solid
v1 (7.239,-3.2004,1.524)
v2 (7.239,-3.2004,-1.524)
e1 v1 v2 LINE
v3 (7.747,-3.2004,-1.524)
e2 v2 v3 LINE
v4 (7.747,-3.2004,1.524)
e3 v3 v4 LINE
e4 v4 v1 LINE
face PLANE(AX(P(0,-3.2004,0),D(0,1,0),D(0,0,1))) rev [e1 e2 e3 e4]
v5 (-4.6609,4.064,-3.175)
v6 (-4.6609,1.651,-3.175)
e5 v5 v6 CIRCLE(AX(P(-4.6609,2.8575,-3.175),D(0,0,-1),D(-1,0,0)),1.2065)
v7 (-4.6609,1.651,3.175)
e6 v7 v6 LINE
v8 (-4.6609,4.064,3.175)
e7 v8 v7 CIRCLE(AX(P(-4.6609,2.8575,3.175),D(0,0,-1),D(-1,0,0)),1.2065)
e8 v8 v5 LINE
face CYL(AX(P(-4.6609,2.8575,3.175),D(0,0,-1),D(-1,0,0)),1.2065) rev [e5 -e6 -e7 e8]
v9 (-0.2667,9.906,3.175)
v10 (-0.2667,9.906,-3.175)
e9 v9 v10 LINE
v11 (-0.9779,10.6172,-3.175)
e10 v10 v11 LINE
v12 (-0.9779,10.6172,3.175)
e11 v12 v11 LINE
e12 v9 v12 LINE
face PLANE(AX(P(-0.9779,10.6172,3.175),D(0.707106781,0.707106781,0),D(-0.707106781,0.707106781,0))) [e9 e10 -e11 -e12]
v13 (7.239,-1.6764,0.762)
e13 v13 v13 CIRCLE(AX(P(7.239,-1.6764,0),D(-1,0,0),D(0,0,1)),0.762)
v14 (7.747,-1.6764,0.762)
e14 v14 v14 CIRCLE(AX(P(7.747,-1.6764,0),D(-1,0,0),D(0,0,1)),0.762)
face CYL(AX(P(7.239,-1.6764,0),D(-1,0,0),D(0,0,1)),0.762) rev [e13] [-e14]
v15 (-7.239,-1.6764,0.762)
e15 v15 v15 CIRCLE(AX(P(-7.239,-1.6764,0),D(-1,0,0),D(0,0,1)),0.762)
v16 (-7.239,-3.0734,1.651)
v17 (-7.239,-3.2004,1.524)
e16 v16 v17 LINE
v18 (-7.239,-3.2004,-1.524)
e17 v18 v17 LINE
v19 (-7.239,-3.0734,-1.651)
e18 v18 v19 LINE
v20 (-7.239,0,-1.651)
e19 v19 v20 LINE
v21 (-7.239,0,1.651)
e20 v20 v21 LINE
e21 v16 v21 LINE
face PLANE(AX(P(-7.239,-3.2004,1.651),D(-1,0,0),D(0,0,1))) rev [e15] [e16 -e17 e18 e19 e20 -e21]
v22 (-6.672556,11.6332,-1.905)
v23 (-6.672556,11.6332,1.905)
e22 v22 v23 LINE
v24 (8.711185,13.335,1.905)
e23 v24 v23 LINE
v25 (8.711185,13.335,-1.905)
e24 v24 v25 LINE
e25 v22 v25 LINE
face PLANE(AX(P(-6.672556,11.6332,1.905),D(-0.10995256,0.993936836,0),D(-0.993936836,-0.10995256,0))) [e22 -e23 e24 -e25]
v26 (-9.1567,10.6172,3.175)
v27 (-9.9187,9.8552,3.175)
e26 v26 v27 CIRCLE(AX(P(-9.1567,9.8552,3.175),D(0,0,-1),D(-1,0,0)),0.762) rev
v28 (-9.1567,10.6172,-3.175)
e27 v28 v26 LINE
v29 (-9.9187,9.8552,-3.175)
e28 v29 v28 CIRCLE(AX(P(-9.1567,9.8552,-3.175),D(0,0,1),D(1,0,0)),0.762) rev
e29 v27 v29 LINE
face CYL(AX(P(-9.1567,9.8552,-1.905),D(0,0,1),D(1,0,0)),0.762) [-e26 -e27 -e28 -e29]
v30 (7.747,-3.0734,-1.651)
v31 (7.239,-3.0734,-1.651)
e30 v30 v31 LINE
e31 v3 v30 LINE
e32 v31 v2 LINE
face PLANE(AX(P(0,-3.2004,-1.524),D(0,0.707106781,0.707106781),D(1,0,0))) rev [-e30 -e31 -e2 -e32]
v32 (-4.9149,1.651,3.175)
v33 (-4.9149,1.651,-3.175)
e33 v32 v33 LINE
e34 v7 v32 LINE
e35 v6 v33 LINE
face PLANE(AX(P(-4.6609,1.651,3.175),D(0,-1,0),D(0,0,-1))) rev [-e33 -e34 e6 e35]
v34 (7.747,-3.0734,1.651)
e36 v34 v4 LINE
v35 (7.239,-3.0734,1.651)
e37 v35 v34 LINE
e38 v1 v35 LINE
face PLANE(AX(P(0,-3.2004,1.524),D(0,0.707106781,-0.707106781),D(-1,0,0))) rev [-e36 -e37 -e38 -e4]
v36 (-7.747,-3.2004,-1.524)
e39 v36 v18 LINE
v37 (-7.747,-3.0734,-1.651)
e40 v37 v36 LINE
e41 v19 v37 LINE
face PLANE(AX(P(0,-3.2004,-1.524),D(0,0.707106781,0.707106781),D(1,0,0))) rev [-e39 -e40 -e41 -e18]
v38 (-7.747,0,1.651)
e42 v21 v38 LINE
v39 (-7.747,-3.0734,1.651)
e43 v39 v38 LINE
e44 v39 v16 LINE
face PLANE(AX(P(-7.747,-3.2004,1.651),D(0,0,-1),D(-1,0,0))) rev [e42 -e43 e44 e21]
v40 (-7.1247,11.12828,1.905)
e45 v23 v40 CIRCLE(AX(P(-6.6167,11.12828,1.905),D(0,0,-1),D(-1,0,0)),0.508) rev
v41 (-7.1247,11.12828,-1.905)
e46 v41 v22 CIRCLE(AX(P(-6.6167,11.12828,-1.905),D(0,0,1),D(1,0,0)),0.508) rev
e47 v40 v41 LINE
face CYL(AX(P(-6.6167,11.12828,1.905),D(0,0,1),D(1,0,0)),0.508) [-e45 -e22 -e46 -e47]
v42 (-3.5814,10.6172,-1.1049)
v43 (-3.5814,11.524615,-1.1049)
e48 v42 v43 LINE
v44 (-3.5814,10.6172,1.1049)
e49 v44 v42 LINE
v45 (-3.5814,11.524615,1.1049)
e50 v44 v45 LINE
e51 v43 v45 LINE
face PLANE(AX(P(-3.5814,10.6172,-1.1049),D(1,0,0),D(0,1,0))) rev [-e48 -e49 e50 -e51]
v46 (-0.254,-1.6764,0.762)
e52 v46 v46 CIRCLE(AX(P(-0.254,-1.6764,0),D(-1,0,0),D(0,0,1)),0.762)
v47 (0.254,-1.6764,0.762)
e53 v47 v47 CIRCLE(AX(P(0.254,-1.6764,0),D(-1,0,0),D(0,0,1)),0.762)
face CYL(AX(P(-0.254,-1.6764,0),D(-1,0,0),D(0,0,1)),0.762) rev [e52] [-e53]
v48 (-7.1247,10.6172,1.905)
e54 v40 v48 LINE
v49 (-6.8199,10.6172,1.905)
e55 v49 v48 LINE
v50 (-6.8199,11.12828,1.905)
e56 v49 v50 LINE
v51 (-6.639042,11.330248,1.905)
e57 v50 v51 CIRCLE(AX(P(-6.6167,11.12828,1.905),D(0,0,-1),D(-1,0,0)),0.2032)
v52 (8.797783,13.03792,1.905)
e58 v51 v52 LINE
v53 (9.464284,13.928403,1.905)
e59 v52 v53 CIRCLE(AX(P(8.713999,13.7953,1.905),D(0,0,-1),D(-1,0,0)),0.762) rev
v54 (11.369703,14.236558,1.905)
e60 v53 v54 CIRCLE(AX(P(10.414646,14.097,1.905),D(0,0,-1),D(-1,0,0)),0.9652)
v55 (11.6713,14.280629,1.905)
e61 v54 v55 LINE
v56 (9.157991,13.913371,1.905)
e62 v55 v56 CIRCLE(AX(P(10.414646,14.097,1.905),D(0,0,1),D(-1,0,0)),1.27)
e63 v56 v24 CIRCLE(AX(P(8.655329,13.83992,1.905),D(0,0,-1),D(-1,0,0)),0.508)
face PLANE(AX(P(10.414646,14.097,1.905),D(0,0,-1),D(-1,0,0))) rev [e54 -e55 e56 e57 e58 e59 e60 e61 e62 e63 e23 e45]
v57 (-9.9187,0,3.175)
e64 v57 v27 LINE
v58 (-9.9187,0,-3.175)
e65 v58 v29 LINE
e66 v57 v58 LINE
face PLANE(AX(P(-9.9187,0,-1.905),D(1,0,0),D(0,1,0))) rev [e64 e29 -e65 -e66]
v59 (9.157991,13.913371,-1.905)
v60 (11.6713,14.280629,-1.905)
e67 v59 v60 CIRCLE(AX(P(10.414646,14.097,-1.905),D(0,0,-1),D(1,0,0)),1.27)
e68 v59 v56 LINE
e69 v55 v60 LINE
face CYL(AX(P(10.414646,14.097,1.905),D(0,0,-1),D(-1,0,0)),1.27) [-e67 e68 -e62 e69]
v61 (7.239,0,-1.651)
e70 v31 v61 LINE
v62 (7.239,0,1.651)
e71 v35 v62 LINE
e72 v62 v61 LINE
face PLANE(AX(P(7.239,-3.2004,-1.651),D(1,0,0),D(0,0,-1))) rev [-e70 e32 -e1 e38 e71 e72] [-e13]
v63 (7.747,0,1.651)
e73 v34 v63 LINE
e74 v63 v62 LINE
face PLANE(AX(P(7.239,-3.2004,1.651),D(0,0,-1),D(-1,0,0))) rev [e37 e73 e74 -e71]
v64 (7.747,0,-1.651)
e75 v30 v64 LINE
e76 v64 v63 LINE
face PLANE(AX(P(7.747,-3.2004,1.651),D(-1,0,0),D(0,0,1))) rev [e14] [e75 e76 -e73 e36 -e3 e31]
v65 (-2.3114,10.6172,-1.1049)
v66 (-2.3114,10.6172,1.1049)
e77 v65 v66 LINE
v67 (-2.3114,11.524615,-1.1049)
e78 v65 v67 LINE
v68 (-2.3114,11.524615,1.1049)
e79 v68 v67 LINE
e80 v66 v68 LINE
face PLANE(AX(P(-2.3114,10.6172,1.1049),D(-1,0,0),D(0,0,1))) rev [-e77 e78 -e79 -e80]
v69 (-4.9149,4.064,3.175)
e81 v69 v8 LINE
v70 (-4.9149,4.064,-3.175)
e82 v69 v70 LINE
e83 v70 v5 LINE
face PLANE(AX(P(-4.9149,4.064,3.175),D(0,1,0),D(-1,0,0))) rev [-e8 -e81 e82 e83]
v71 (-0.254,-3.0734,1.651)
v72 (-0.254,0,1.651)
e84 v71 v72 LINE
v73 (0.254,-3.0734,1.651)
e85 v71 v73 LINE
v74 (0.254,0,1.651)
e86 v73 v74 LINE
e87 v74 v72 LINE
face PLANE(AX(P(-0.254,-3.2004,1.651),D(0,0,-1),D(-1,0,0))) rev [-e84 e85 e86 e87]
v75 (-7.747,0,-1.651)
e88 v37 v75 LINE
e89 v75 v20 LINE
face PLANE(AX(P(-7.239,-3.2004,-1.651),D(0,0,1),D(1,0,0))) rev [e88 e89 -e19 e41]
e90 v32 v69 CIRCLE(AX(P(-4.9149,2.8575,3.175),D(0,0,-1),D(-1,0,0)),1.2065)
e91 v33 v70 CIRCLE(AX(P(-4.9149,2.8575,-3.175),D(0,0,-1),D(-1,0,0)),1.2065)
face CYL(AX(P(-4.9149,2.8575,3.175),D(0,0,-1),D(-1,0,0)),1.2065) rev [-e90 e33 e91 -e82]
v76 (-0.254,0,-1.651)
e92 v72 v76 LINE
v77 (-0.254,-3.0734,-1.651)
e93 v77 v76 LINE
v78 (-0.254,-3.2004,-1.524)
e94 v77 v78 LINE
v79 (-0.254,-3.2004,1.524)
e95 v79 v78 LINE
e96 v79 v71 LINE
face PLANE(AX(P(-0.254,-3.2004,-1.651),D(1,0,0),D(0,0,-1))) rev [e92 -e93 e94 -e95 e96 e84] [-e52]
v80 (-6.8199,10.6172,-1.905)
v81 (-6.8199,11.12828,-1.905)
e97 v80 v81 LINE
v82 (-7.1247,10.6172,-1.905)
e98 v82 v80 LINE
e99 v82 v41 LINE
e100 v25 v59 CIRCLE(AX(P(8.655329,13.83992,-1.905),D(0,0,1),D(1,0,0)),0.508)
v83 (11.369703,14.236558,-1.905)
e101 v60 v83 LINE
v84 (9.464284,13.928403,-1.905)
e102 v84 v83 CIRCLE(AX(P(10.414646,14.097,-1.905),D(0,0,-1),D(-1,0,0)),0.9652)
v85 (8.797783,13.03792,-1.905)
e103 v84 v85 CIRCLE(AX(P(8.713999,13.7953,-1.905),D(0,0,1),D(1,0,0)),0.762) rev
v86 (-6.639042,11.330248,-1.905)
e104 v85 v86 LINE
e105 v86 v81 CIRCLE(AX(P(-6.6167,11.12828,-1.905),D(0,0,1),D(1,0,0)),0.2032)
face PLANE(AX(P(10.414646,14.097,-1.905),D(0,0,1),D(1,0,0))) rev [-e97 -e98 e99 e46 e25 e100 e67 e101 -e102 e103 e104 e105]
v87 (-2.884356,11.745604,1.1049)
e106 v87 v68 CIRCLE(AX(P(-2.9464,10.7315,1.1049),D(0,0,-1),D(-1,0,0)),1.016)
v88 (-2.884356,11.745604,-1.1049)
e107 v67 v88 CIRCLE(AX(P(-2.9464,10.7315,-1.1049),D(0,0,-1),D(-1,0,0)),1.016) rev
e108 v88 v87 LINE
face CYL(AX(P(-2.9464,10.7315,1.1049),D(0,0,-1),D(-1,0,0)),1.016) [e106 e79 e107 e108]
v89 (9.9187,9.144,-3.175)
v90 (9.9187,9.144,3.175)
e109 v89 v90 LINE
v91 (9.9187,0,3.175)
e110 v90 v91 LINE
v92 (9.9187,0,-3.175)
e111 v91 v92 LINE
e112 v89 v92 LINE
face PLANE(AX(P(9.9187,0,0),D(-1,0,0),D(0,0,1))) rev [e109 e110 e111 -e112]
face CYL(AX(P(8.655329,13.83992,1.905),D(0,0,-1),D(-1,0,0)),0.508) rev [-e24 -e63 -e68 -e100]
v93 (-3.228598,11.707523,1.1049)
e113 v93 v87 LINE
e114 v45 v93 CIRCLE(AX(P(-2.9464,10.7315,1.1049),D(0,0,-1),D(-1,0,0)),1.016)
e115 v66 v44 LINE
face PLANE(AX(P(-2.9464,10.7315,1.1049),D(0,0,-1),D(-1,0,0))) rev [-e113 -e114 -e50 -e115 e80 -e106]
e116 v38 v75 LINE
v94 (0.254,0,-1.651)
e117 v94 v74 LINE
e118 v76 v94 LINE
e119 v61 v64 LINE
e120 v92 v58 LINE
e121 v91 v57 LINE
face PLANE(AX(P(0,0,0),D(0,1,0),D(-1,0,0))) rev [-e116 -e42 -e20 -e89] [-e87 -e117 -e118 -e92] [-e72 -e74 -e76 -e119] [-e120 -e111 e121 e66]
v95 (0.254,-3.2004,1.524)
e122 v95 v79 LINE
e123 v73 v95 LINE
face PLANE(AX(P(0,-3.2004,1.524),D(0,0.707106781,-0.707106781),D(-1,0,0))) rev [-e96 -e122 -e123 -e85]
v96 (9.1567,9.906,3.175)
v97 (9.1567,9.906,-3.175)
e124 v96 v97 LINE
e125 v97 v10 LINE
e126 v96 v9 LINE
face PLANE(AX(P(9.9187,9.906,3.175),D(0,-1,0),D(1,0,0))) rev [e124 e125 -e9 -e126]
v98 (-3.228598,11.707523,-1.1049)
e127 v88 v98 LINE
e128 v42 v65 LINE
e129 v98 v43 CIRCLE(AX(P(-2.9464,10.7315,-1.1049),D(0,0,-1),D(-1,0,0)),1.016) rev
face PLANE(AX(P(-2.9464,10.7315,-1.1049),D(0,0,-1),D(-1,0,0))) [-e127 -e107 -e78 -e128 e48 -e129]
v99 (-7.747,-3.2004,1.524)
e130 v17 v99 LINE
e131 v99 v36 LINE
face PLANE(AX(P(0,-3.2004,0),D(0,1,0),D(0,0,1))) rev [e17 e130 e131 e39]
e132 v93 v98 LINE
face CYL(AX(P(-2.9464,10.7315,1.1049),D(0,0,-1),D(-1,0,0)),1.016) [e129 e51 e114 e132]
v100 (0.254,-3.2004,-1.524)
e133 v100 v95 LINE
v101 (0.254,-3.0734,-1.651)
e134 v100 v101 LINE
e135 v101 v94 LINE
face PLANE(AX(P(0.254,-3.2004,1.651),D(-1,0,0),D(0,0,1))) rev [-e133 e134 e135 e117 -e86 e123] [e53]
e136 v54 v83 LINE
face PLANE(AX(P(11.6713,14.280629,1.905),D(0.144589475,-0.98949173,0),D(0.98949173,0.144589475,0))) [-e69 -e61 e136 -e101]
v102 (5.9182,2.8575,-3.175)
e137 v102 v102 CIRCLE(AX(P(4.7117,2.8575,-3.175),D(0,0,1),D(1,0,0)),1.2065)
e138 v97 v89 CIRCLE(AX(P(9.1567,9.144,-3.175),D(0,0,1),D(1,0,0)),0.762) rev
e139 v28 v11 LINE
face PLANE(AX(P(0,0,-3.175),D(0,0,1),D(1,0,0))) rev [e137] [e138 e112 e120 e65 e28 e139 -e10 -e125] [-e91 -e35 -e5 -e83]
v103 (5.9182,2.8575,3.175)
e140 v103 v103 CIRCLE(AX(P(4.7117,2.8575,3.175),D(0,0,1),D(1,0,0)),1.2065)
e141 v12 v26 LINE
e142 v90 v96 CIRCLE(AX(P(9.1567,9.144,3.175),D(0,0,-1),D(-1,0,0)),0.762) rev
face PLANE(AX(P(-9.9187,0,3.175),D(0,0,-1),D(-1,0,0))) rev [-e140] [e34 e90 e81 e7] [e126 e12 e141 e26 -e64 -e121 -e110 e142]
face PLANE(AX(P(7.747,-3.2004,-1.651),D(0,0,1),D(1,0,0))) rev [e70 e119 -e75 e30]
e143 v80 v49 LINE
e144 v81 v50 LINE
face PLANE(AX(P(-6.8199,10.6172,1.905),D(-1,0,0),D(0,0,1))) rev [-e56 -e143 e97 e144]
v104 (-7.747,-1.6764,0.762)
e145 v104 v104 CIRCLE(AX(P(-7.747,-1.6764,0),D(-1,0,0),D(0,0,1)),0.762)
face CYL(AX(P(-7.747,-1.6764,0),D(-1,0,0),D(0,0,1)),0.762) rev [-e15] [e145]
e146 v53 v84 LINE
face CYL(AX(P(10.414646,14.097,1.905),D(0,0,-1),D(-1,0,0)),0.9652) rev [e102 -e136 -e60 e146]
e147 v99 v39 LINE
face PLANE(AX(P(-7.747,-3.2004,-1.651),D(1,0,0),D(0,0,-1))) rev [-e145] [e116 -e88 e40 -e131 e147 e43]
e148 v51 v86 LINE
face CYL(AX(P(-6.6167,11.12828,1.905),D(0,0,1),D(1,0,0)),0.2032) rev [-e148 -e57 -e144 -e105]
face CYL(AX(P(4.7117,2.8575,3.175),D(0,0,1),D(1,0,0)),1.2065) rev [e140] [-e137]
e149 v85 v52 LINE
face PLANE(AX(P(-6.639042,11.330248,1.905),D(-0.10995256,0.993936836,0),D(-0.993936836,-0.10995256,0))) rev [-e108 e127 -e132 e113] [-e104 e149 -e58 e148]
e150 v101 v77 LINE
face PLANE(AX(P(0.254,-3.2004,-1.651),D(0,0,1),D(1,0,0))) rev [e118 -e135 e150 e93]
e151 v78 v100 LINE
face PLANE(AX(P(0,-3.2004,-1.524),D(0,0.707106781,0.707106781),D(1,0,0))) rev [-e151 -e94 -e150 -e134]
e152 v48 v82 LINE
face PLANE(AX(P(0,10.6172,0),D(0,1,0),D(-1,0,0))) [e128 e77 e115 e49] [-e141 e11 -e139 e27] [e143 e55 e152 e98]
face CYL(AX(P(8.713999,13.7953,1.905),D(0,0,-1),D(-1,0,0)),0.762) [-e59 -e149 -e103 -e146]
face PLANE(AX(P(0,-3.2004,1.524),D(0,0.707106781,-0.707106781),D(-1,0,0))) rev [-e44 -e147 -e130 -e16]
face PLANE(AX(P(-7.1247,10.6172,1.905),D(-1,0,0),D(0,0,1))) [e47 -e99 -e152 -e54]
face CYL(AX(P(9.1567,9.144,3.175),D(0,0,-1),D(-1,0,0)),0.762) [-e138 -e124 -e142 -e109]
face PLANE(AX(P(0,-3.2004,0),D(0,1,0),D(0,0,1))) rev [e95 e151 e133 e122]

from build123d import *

# Parameters (mm, degrees)
BOSS_EXTRUDE1_START   = -2.2098
BOSS_EXTRUDE1_DEPTH   = 3.0099
BOSS_EXTRUDE1_2_DEPTH = 2.2098
BOSS_EXTRUDE2_START   = 0.8001
BOSS_EXTRUDE2_DEPTH   = 0.8001
SKETCH3_W             = 1.27
SKETCH3_H             = 2.2098
BOSS_EXTRUDE3_DEPTH   = 0.907414746
SKETCH4_W             = 0.3048
SKETCH4_H             = 3.81
BOSS_EXTRUDE4_DEPTH   = 0.693040986
SKETCH5_W             = 7.6073
SKETCH5_H             = 5.08
BOSS_EXTRUDE5_DEPTH   = 10.6172
SKETCH6_W             = 5.08
SKETCH6_H             = 10.6172
BOSS_EXTRUDE6_DEPTH   = 12.2301
SKETCH7_W             = 19.8374
SKETCH7_H             = 10.6172
BOSS_EXTRUDE7_DEPTH   = 1.27
SKETCH8_W             = 10.8966
SKETCH8_H             = 0.7112
CUT_EXTRUDE1_DEPTH    = 21.314685149
CUT_EXTRUDE2_DEPTH    = 21.314685149
SKETCH10_W            = 0.508
SKETCH10_H            = 3.302
BOSS_EXTRUDE8_DEPTH   = 3.2004
SKETCH11_W            = 0.508
SKETCH11_H            = 3.302
BOSS_EXTRUDE9_DEPTH   = 3.2004
SKETCH12_W            = 0.508
SKETCH12_H            = 3.302
BOSS_EXTRUDE10_DEPTH  = 3.2004
DRAFT1_ANGLE          = 45
SKETCH13_W            = 0.9652
SKETCH13_H            = 3.81
M2_CLEARANCE_HOLE1_D  = 2.413
HOLE1_D               = 1.524
HOLE1_DEPTH           = 4.4323
HOLE2_D               = 1.524
HOLE2_DEPTH           = 0.508
HOLE3_D               = 1.524
HOLE3_DEPTH           = 11.9253
CHAMFER1_SIZE         = 0.127
FILLET1_R             = 0.2032
FILLET2_R             = 0.508
FILLET3_R             = 0.762


with BuildPart() as part:
    # Boss-Extrude1: read off the stored shape, not the designer's step
    # Boss-Extrude1 outline → Boss-Extrude1 (new body)
    with BuildSketch(Plane.XY.offset(1.1049).offset(BOSS_EXTRUDE1_START)):
        with BuildLine():
            ThreePointArc((10.105641195, 13.182599991), (11.032749783, 13.355678114), (11.369702921, 14.236557762))
            Line((11.369702921, 14.236557762), (11.6713, 14.280628634))
            ThreePointArc((11.6713, 14.280628634), (9.96678948, 15.2854128), (9.349347434, 13.405595614))
            Line((9.349347434, 13.405595614), (-7.1247, 11.583182333))
            Line((-7.1247, 11.583182333), (-7.1247, 11.310240986))
            Line((-7.1247, 11.310240986), (-6.8199, 11.310240986))
            Line((-6.8199, 11.310240986), (10.105641195, 13.182599991))
        make_face()
    extrude(amount=BOSS_EXTRUDE1_DEPTH)

    # Boss-Extrude1 2 outline → Boss-Extrude1 2 (add)
    with BuildSketch(Plane.XY.offset(1.1049).offset(BOSS_EXTRUDE1_START)):
        with BuildLine():
            ThreePointArc((-2.3114, 11.524614746), (-2.580781823, 11.679434254), (-2.884355928, 11.745603808))
            Line((-2.884355928, 11.745603808), (-3.228598394, 11.707522575))
            ThreePointArc((-3.228598394, 11.707522575), (-3.414029171, 11.633486118), (-3.5814, 11.524614746))
            Line((-3.5814, 11.524614746), (-2.3114, 11.524614746))
        make_face()
    extrude(amount=BOSS_EXTRUDE1_2_DEPTH)

    # Sketch2 → Boss-Extrude2 (add)
    with BuildSketch(Plane(origin=(0, 0, -1.1049), x_dir=(-1, 0, 0), z_dir=(0, 0, -1)).offset(BOSS_EXTRUDE2_START)):
        with BuildLine():
            Line((6.8199, 11.310240986), (-10.105641195, 13.182599991))
            ThreePointArc((-10.105641195, 13.182599991), (-11.032749783, 13.355678114), (-11.369702921, 14.236557762))
            Line((-11.369702921, 14.236557762), (-11.6713, 14.280628634))
            ThreePointArc((-11.6713, 14.280628634), (-9.96678948, 15.2854128), (-9.349347434, 13.405595614))
            Line((-9.349347434, 13.405595614), (7.1247, 11.583182333))
            Line((7.1247, 11.583182333), (7.1247, 11.310240986))
            Line((7.1247, 11.310240986), (6.8199, 11.310240986))
        make_face()
    extrude(amount=-BOSS_EXTRUDE2_DEPTH)

    # Sketch3 → Boss-Extrude3 (add)
    with BuildSketch(Plane.XZ.offset(-11.524614746)):
        with Locations((-2.9464, 0)):
            Rectangle(SKETCH3_W, SKETCH3_H)
    extrude(amount=BOSS_EXTRUDE3_DEPTH)

    # Sketch4 → Boss-Extrude4 (add)
    with BuildSketch(Plane.XZ.offset(-11.310240986)):
        with Locations((-6.9723, 0)):
            Rectangle(SKETCH4_W, SKETCH4_H)
    extrude(amount=BOSS_EXTRUDE4_DEPTH)

    # Sketch5 → Boss-Extrude5 (add)
    with BuildSketch(Plane.XZ.offset(-10.6172)):
        with Locations((-6.11505, 0.635)):
            Rectangle(SKETCH5_W, SKETCH5_H)
    extrude(amount=BOSS_EXTRUDE5_DEPTH)

    # Sketch6 → Boss-Extrude6 (add)
    with BuildSketch(Plane(origin=(-2.3114, 0, 0), x_dir=(0, 0, -1), z_dir=(1, 0, 0))):
        with Locations((-0.635, 5.3086)):
            Rectangle(SKETCH6_W, SKETCH6_H)
    extrude(amount=BOSS_EXTRUDE6_DEPTH)

    # Sketch7 → Boss-Extrude7 (add)
    with BuildSketch(Plane(origin=(0, 0, -1.905), x_dir=(-1, 0, 0), z_dir=(0, 0, -1))):
        with Locations((0, 5.3086)):
            Rectangle(SKETCH7_W, SKETCH7_H)
    extrude(amount=BOSS_EXTRUDE7_DEPTH)

    # Sketch8 → Cut-Extrude1 (cut, through all)
    with BuildSketch(Plane(origin=(0, 0, -3.175), x_dir=(-1, 0, 0), z_dir=(0, 0, -1))):
        with Locations((-4.4704, 10.2616)):
            Rectangle(SKETCH8_W, SKETCH8_H)
    extrude(amount=-CUT_EXTRUDE1_DEPTH, mode=Mode.SUBTRACT)

    # Sketch9 → Cut-Extrude2 (cut, through all)
    with BuildSketch(Plane(origin=(0, 0, -3.175), x_dir=(-1, 0, 0), z_dir=(0, 0, -1))):
        with BuildLine():
            Line((4.9149, 4.064), (4.6609, 4.064))
            ThreePointArc((4.6609, 4.064), (3.4544, 2.8575), (4.6609, 1.651))
            Line((4.6609, 1.651), (4.9149, 1.651))
            ThreePointArc((4.9149, 1.651), (6.1214, 2.8575), (4.9149, 4.064))
        make_face()
    extrude(amount=-CUT_EXTRUDE2_DEPTH, mode=Mode.SUBTRACT)

    # Sketch10 → Boss-Extrude8 (add)
    with BuildSketch(Plane.XZ):
        Rectangle(SKETCH10_W, SKETCH10_H)
    extrude(amount=BOSS_EXTRUDE8_DEPTH)

    # Sketch11 → Boss-Extrude9 (add)
    with BuildSketch(Plane.XZ):
        with Locations((-7.493, 0)):
            Rectangle(SKETCH11_W, SKETCH11_H)
    extrude(amount=BOSS_EXTRUDE9_DEPTH)

    # Sketch12 → Boss-Extrude10 (add)
    with BuildSketch(Plane.XZ):
        with Locations((7.493, 0)):
            Rectangle(SKETCH12_W, SKETCH12_H)
    extrude(amount=BOSS_EXTRUDE10_DEPTH)

    # Draft1
    draft1_faces = [part.faces().sort_by_distance(p)[0] for p in [
        (-0.9779, 10.2616, 0),
    ]]
    draft(draft1_faces, Plane(origin=(0, 10.6172, 0), x_dir=(1, 0, 0), z_dir=(0, 1, 0)), DRAFT1_ANGLE)

    # Sketch13 → Cut-Revolve1 (revolve, cut)
    with BuildSketch(Plane.XZ.offset(-14.097)):
        with Locations((10.897245503, 0)):
            Rectangle(SKETCH13_W, SKETCH13_H)
    revolve(axis=Axis((10.414645503, 14.097, 1.905), (0, 0, -1)), mode=Mode.SUBTRACT)

    # M2 Clearance Hole1 (through all)
    with Locations(Plane.XY.offset(3.175)):
        with Locations((4.7117, 2.8575)):
            Hole(M2_CLEARANCE_HOLE1_D / 2)

    # Hole1
    with Locations(Plane.ZY.offset(-7.239)):
        with Locations((0, -1.6764)):
            Hole(HOLE1_D / 2, depth=HOLE1_DEPTH)

    # Hole2
    with Locations(Plane.ZY.offset(7.747)):
        with Locations((0, -1.6764)):
            Hole(HOLE2_D / 2, depth=HOLE2_DEPTH)

    # Hole3
    with Locations(Plane.ZY.offset(0.254)):
        with Locations((0, -1.6764)):
            Hole(HOLE3_D / 2, depth=HOLE3_DEPTH)

    # Chamfer1
    chamfer1_edges = [part.edges().sort_by_distance(p)[0] for p in [
        (0, -3.2004, -1.651),
        (0, -3.2004, 1.651),
        (-7.493, -3.2004, -1.651),
        (-7.493, -3.2004, 1.651),
        (7.493, -3.2004, -1.651),
        (7.493, -3.2004, 1.651),
    ]]
    chamfer(chamfer1_edges, length=CHAMFER1_SIZE)

    # Fillet1
    fillet1_edges = [part.edges().sort_by_distance(p)[0] for p in [
        (-6.8199, 11.310240986, 0.40005),
    ]]
    fillet(fillet1_edges, radius=FILLET1_R)

    # Fillet2
    fillet2_edges = [part.edges().sort_by_distance(p)[0] for p in [
        (-7.1247, 11.583182333, 0.40005),
        (9.349347434, 13.405595614, 0.40005),
    ]]
    fillet(fillet2_edges, radius=FILLET2_R)

    # Fillet3
    fillet3_edges = [part.edges().sort_by_distance(p)[0] for p in [
        (10.105641195, 13.182599991, 0.40005),
        (-9.9187, 10.6172, 0),
        (9.9187, 9.906, 0),
    ]]
    fillet(fillet3_edges, radius=FILLET3_R)


solid = part.part
